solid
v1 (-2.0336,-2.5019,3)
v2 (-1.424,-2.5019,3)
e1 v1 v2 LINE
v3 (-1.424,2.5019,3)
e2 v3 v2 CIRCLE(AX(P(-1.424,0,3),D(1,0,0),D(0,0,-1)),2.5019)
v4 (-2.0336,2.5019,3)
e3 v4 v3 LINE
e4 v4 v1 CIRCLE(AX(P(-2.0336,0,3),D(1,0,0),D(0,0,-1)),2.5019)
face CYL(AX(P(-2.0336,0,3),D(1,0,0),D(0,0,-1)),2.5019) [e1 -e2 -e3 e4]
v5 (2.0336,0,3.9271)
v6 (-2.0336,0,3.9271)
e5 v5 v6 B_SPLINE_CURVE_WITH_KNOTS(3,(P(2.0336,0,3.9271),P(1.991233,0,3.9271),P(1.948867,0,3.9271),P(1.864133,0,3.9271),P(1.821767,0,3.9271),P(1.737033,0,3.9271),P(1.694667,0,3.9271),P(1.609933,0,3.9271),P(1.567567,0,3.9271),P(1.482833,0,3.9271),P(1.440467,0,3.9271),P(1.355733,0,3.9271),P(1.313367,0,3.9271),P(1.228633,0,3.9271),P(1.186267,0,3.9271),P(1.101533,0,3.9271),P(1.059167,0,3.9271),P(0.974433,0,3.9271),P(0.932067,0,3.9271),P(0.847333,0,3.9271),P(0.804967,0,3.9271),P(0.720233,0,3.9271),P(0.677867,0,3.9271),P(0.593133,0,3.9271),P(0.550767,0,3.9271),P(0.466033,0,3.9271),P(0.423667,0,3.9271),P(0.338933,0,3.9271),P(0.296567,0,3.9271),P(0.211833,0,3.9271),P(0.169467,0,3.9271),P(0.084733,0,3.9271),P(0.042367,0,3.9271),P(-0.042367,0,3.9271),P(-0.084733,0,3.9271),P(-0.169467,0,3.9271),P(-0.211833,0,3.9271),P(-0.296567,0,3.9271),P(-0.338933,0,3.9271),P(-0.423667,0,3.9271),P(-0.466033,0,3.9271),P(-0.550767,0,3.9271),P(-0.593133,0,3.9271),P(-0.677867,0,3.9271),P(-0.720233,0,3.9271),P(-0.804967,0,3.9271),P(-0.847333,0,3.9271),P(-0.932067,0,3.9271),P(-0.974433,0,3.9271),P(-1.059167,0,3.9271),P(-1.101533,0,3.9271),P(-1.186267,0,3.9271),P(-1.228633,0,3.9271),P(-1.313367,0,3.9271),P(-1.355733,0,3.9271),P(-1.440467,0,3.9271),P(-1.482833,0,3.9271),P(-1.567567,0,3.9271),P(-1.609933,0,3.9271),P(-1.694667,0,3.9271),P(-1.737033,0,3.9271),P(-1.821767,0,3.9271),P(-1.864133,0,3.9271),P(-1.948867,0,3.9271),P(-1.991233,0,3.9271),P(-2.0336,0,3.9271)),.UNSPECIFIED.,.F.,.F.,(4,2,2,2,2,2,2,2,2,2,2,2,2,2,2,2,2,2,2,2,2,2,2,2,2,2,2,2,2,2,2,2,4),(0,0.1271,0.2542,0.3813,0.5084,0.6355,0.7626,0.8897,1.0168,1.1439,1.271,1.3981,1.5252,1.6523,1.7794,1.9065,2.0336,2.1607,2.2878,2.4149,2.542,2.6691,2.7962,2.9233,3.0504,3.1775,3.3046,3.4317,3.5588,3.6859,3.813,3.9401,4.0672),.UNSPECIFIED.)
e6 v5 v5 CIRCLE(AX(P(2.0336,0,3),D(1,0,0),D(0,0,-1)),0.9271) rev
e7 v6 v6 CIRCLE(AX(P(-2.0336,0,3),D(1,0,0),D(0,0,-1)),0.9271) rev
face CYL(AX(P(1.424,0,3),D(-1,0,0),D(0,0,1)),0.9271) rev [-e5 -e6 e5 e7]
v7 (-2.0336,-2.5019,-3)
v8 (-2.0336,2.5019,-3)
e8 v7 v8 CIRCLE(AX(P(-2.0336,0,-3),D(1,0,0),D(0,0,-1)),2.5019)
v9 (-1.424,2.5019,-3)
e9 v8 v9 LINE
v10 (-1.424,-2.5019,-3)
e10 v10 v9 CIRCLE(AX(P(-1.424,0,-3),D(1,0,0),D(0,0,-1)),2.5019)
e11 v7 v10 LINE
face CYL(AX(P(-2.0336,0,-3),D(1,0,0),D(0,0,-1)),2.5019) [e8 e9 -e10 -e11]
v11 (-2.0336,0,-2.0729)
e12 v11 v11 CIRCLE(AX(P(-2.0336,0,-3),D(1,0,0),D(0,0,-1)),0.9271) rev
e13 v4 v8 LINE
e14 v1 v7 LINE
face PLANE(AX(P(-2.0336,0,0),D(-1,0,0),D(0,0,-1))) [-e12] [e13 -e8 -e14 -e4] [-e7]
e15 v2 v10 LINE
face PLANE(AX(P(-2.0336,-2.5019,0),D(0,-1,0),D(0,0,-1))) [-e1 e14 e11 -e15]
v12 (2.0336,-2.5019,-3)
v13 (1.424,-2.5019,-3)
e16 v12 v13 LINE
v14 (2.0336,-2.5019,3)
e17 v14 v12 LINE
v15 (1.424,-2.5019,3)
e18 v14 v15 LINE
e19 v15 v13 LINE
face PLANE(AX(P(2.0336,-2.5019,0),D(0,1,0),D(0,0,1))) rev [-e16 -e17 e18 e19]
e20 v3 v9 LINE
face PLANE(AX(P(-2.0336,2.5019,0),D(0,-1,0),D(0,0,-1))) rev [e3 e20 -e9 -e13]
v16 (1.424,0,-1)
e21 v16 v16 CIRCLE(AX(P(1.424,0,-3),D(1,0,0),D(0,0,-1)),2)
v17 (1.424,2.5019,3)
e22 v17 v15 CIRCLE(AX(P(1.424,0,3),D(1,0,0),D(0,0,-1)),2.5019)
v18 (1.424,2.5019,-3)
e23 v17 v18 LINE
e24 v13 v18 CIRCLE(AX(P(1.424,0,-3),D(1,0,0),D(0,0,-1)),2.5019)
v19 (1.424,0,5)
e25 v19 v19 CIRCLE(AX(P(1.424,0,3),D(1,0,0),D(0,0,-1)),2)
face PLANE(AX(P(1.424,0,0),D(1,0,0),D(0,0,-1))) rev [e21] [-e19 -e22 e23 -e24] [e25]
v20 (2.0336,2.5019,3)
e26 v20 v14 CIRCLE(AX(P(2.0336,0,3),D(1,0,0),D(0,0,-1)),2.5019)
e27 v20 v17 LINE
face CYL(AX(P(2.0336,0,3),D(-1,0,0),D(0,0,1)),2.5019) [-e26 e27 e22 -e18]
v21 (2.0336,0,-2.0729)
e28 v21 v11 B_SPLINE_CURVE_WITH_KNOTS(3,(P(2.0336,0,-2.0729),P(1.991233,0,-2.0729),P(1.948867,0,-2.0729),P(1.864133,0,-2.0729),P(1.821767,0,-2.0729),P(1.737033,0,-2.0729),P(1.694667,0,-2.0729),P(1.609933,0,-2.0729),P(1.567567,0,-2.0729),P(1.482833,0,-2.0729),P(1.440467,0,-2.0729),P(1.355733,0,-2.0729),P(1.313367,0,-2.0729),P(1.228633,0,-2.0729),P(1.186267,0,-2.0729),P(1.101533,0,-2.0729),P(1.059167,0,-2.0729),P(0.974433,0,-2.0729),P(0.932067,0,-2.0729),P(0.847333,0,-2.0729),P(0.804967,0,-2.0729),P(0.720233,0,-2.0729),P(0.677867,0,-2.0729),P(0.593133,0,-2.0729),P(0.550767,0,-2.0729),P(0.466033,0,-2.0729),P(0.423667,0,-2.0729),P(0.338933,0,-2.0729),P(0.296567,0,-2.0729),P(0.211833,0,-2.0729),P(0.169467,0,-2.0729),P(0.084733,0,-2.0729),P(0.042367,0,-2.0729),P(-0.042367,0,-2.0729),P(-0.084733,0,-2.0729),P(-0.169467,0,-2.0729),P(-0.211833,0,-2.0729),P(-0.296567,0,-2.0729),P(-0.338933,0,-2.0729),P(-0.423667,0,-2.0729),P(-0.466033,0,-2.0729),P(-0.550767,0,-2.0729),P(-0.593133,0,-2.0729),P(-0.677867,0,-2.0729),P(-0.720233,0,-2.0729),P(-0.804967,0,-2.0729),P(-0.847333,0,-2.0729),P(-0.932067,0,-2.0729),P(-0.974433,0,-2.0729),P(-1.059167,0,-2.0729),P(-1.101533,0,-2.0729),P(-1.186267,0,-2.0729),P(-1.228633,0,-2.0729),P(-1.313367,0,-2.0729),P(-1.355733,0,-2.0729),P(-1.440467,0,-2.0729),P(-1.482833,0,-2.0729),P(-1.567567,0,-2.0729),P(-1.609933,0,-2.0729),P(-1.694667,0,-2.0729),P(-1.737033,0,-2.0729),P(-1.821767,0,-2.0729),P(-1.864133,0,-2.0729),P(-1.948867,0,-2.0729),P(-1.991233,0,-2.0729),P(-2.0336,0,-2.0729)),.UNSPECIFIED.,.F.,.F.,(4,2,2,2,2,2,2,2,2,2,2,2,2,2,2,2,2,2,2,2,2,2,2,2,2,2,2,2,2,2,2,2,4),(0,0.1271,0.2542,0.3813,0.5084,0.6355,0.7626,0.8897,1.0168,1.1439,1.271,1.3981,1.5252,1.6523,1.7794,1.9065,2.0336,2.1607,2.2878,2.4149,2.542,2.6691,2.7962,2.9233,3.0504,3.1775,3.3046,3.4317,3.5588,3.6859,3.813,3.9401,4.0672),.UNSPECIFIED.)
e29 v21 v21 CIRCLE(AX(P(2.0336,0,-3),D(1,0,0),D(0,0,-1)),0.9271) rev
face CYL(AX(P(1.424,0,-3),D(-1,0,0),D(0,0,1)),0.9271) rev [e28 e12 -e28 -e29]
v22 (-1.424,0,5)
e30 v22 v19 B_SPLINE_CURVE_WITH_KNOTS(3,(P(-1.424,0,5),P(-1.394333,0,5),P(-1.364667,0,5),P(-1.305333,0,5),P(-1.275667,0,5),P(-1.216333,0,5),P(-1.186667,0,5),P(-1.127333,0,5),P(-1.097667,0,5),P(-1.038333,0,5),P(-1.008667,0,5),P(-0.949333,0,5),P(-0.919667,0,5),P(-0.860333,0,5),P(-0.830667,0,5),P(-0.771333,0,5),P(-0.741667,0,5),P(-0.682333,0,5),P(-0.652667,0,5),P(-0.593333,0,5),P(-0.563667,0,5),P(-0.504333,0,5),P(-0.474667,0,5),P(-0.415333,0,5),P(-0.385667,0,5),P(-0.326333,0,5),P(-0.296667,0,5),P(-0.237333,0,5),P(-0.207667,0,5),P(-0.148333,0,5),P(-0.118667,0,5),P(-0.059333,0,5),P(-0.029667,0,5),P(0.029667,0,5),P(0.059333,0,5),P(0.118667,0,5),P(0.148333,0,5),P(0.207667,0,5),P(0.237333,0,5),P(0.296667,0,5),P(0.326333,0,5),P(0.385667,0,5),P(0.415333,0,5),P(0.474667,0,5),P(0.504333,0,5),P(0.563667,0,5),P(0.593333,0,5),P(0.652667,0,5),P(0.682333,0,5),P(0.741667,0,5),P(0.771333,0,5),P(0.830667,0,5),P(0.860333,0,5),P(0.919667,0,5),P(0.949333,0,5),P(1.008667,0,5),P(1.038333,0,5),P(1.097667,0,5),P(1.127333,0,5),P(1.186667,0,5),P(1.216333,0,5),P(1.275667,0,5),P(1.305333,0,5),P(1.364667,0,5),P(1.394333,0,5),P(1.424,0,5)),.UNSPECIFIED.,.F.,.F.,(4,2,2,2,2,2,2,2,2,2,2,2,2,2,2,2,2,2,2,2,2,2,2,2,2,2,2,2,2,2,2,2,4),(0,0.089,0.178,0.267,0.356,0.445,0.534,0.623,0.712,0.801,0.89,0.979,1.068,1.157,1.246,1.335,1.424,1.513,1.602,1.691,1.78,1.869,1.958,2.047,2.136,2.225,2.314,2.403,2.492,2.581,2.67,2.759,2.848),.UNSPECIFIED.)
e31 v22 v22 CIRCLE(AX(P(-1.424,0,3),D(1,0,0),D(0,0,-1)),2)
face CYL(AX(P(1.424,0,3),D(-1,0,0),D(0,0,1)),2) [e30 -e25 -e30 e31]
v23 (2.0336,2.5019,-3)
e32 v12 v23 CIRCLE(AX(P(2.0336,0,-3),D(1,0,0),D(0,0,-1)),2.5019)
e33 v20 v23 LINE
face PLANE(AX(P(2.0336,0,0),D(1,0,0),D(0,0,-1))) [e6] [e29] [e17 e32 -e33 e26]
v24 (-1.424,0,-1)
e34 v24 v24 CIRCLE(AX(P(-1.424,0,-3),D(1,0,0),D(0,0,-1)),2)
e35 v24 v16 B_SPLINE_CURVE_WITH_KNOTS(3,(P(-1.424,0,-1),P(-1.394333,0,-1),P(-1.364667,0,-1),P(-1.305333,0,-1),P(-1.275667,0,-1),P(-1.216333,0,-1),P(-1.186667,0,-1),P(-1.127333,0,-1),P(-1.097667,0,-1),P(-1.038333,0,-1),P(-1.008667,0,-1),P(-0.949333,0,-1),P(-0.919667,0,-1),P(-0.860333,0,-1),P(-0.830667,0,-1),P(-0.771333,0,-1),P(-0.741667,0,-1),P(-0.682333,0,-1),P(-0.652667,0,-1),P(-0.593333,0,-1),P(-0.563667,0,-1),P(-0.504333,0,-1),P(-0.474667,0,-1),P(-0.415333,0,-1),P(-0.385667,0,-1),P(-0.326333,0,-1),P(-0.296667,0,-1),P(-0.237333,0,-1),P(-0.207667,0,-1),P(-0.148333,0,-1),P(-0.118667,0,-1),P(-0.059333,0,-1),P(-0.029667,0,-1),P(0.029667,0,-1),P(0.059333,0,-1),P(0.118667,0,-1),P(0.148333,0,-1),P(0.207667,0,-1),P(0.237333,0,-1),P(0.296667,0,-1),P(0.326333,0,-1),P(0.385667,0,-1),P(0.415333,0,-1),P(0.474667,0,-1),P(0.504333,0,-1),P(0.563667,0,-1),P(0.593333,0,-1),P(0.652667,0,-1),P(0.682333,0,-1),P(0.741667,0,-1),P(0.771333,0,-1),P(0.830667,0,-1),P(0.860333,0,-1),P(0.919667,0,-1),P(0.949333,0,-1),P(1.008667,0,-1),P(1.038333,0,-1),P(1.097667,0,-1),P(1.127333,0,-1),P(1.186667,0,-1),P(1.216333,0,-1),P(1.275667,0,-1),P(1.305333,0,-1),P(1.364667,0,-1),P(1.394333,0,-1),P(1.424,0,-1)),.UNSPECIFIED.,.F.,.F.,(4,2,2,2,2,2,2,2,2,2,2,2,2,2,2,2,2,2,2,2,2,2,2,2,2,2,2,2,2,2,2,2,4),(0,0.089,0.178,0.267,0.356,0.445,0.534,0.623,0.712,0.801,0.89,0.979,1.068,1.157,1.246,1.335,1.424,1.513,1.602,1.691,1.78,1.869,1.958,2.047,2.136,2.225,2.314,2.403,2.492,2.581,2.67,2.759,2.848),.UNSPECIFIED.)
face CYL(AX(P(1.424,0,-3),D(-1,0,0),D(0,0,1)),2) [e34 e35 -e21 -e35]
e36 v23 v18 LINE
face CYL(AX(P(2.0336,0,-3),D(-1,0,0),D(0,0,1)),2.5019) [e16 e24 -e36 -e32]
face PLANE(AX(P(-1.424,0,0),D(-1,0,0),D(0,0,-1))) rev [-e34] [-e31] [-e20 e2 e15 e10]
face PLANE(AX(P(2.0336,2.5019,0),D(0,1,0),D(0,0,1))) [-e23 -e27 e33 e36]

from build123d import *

# Parameters (mm, degrees)
SKETCH1_R               = 0.9271
BOSS_EXTRUDE1_DEPTH     = 1.424
BOSS_EXTRUDE2_OUTLINE_R = 0.9271
BOSS_EXTRUDE2_DEPTH     = 0.6096
CUT_EXTRUDE2_START      = -1.424
SKETCH3_R               = 2
CUT_EXTRUDE2_DEPTH      = 2.848


# Read off the part's stored shape, not the designer's step: Boss-Extrude2
with BuildPart() as part:
    # Sketch1 → Boss-Extrude1 (new, symmetric)
    with BuildSketch(Plane(origin=(0, 0, 0), x_dir=(0, 0, -1), z_dir=(1, 0, 0))):
        with BuildLine():
            Line((-3, 2), (3, 2))
            ThreePointArc((3, 2), (5, 0), (3, -2))
            Line((3, -2), (-3, -2))
            ThreePointArc((-3, -2), (-5, 0), (-3, 2))
        make_face()
        with Locations(Location((-3, 0, 0), (0, 0, 180))):
            Circle(SKETCH1_R, mode=Mode.SUBTRACT)
        with Locations(Location((3, 0, 0), (0, 0, 180))):
            Circle(SKETCH1_R, mode=Mode.SUBTRACT)
    extrude(amount=BOSS_EXTRUDE1_DEPTH, both=True)

    # Boss-Extrude2 outline → Boss-Extrude2 (add)
    with BuildSketch(Plane(origin=(1.424, 0, 0), x_dir=(0, 0, -1), z_dir=(1, 0, 0))):
        with BuildLine():
            Line((-3, -2.5019), (3, -2.5019))
            ThreePointArc((3, -2.5019), (5.5019, 0), (3, 2.5019))
            Line((3, 2.5019), (-3, 2.5019))
            ThreePointArc((-3, 2.5019), (-5.5019, 0), (-3, -2.5019))
        make_face()
        with Locations((-3, 0)):
            Circle(BOSS_EXTRUDE2_OUTLINE_R, mode=Mode.SUBTRACT)
        with Locations((3, 0)):
            Circle(BOSS_EXTRUDE2_OUTLINE_R, mode=Mode.SUBTRACT)
    boss_extrude2 = extrude(amount=BOSS_EXTRUDE2_DEPTH)

    # Mirror1: Boss-Extrude2 across plane
    add(boss_extrude2.mirror(Plane(origin=(0, 0, 0), x_dir=(0, 0, 1), z_dir=(1, 0, 0))))

    # Sketch3 → Cut-Extrude2 (cut)
    with BuildSketch(Plane(origin=(0, 0, 0), x_dir=(0, 0, -1), z_dir=(1, 0, 0)).offset(CUT_EXTRUDE2_START)):
        with BuildLine():
            Line((-3, 2.5019), (3, 2.5019))
            ThreePointArc((3, 2.5019), (5.5019, 0), (3, -2.5019))
            Line((3, -2.5019), (-3, -2.5019))
            ThreePointArc((-3, -2.5019), (-5.5019, 0), (-3, 2.5019))
        make_face()
        with Locations(Location((-3, 0, 0), (0, 0, 180))):
            Circle(SKETCH3_R, mode=Mode.SUBTRACT)
        with Locations(Location((3, 0, 0), (0, 0, 180))):
            Circle(SKETCH3_R, mode=Mode.SUBTRACT)
    extrude(amount=CUT_EXTRUDE2_DEPTH, mode=Mode.SUBTRACT)


solid = part.part
